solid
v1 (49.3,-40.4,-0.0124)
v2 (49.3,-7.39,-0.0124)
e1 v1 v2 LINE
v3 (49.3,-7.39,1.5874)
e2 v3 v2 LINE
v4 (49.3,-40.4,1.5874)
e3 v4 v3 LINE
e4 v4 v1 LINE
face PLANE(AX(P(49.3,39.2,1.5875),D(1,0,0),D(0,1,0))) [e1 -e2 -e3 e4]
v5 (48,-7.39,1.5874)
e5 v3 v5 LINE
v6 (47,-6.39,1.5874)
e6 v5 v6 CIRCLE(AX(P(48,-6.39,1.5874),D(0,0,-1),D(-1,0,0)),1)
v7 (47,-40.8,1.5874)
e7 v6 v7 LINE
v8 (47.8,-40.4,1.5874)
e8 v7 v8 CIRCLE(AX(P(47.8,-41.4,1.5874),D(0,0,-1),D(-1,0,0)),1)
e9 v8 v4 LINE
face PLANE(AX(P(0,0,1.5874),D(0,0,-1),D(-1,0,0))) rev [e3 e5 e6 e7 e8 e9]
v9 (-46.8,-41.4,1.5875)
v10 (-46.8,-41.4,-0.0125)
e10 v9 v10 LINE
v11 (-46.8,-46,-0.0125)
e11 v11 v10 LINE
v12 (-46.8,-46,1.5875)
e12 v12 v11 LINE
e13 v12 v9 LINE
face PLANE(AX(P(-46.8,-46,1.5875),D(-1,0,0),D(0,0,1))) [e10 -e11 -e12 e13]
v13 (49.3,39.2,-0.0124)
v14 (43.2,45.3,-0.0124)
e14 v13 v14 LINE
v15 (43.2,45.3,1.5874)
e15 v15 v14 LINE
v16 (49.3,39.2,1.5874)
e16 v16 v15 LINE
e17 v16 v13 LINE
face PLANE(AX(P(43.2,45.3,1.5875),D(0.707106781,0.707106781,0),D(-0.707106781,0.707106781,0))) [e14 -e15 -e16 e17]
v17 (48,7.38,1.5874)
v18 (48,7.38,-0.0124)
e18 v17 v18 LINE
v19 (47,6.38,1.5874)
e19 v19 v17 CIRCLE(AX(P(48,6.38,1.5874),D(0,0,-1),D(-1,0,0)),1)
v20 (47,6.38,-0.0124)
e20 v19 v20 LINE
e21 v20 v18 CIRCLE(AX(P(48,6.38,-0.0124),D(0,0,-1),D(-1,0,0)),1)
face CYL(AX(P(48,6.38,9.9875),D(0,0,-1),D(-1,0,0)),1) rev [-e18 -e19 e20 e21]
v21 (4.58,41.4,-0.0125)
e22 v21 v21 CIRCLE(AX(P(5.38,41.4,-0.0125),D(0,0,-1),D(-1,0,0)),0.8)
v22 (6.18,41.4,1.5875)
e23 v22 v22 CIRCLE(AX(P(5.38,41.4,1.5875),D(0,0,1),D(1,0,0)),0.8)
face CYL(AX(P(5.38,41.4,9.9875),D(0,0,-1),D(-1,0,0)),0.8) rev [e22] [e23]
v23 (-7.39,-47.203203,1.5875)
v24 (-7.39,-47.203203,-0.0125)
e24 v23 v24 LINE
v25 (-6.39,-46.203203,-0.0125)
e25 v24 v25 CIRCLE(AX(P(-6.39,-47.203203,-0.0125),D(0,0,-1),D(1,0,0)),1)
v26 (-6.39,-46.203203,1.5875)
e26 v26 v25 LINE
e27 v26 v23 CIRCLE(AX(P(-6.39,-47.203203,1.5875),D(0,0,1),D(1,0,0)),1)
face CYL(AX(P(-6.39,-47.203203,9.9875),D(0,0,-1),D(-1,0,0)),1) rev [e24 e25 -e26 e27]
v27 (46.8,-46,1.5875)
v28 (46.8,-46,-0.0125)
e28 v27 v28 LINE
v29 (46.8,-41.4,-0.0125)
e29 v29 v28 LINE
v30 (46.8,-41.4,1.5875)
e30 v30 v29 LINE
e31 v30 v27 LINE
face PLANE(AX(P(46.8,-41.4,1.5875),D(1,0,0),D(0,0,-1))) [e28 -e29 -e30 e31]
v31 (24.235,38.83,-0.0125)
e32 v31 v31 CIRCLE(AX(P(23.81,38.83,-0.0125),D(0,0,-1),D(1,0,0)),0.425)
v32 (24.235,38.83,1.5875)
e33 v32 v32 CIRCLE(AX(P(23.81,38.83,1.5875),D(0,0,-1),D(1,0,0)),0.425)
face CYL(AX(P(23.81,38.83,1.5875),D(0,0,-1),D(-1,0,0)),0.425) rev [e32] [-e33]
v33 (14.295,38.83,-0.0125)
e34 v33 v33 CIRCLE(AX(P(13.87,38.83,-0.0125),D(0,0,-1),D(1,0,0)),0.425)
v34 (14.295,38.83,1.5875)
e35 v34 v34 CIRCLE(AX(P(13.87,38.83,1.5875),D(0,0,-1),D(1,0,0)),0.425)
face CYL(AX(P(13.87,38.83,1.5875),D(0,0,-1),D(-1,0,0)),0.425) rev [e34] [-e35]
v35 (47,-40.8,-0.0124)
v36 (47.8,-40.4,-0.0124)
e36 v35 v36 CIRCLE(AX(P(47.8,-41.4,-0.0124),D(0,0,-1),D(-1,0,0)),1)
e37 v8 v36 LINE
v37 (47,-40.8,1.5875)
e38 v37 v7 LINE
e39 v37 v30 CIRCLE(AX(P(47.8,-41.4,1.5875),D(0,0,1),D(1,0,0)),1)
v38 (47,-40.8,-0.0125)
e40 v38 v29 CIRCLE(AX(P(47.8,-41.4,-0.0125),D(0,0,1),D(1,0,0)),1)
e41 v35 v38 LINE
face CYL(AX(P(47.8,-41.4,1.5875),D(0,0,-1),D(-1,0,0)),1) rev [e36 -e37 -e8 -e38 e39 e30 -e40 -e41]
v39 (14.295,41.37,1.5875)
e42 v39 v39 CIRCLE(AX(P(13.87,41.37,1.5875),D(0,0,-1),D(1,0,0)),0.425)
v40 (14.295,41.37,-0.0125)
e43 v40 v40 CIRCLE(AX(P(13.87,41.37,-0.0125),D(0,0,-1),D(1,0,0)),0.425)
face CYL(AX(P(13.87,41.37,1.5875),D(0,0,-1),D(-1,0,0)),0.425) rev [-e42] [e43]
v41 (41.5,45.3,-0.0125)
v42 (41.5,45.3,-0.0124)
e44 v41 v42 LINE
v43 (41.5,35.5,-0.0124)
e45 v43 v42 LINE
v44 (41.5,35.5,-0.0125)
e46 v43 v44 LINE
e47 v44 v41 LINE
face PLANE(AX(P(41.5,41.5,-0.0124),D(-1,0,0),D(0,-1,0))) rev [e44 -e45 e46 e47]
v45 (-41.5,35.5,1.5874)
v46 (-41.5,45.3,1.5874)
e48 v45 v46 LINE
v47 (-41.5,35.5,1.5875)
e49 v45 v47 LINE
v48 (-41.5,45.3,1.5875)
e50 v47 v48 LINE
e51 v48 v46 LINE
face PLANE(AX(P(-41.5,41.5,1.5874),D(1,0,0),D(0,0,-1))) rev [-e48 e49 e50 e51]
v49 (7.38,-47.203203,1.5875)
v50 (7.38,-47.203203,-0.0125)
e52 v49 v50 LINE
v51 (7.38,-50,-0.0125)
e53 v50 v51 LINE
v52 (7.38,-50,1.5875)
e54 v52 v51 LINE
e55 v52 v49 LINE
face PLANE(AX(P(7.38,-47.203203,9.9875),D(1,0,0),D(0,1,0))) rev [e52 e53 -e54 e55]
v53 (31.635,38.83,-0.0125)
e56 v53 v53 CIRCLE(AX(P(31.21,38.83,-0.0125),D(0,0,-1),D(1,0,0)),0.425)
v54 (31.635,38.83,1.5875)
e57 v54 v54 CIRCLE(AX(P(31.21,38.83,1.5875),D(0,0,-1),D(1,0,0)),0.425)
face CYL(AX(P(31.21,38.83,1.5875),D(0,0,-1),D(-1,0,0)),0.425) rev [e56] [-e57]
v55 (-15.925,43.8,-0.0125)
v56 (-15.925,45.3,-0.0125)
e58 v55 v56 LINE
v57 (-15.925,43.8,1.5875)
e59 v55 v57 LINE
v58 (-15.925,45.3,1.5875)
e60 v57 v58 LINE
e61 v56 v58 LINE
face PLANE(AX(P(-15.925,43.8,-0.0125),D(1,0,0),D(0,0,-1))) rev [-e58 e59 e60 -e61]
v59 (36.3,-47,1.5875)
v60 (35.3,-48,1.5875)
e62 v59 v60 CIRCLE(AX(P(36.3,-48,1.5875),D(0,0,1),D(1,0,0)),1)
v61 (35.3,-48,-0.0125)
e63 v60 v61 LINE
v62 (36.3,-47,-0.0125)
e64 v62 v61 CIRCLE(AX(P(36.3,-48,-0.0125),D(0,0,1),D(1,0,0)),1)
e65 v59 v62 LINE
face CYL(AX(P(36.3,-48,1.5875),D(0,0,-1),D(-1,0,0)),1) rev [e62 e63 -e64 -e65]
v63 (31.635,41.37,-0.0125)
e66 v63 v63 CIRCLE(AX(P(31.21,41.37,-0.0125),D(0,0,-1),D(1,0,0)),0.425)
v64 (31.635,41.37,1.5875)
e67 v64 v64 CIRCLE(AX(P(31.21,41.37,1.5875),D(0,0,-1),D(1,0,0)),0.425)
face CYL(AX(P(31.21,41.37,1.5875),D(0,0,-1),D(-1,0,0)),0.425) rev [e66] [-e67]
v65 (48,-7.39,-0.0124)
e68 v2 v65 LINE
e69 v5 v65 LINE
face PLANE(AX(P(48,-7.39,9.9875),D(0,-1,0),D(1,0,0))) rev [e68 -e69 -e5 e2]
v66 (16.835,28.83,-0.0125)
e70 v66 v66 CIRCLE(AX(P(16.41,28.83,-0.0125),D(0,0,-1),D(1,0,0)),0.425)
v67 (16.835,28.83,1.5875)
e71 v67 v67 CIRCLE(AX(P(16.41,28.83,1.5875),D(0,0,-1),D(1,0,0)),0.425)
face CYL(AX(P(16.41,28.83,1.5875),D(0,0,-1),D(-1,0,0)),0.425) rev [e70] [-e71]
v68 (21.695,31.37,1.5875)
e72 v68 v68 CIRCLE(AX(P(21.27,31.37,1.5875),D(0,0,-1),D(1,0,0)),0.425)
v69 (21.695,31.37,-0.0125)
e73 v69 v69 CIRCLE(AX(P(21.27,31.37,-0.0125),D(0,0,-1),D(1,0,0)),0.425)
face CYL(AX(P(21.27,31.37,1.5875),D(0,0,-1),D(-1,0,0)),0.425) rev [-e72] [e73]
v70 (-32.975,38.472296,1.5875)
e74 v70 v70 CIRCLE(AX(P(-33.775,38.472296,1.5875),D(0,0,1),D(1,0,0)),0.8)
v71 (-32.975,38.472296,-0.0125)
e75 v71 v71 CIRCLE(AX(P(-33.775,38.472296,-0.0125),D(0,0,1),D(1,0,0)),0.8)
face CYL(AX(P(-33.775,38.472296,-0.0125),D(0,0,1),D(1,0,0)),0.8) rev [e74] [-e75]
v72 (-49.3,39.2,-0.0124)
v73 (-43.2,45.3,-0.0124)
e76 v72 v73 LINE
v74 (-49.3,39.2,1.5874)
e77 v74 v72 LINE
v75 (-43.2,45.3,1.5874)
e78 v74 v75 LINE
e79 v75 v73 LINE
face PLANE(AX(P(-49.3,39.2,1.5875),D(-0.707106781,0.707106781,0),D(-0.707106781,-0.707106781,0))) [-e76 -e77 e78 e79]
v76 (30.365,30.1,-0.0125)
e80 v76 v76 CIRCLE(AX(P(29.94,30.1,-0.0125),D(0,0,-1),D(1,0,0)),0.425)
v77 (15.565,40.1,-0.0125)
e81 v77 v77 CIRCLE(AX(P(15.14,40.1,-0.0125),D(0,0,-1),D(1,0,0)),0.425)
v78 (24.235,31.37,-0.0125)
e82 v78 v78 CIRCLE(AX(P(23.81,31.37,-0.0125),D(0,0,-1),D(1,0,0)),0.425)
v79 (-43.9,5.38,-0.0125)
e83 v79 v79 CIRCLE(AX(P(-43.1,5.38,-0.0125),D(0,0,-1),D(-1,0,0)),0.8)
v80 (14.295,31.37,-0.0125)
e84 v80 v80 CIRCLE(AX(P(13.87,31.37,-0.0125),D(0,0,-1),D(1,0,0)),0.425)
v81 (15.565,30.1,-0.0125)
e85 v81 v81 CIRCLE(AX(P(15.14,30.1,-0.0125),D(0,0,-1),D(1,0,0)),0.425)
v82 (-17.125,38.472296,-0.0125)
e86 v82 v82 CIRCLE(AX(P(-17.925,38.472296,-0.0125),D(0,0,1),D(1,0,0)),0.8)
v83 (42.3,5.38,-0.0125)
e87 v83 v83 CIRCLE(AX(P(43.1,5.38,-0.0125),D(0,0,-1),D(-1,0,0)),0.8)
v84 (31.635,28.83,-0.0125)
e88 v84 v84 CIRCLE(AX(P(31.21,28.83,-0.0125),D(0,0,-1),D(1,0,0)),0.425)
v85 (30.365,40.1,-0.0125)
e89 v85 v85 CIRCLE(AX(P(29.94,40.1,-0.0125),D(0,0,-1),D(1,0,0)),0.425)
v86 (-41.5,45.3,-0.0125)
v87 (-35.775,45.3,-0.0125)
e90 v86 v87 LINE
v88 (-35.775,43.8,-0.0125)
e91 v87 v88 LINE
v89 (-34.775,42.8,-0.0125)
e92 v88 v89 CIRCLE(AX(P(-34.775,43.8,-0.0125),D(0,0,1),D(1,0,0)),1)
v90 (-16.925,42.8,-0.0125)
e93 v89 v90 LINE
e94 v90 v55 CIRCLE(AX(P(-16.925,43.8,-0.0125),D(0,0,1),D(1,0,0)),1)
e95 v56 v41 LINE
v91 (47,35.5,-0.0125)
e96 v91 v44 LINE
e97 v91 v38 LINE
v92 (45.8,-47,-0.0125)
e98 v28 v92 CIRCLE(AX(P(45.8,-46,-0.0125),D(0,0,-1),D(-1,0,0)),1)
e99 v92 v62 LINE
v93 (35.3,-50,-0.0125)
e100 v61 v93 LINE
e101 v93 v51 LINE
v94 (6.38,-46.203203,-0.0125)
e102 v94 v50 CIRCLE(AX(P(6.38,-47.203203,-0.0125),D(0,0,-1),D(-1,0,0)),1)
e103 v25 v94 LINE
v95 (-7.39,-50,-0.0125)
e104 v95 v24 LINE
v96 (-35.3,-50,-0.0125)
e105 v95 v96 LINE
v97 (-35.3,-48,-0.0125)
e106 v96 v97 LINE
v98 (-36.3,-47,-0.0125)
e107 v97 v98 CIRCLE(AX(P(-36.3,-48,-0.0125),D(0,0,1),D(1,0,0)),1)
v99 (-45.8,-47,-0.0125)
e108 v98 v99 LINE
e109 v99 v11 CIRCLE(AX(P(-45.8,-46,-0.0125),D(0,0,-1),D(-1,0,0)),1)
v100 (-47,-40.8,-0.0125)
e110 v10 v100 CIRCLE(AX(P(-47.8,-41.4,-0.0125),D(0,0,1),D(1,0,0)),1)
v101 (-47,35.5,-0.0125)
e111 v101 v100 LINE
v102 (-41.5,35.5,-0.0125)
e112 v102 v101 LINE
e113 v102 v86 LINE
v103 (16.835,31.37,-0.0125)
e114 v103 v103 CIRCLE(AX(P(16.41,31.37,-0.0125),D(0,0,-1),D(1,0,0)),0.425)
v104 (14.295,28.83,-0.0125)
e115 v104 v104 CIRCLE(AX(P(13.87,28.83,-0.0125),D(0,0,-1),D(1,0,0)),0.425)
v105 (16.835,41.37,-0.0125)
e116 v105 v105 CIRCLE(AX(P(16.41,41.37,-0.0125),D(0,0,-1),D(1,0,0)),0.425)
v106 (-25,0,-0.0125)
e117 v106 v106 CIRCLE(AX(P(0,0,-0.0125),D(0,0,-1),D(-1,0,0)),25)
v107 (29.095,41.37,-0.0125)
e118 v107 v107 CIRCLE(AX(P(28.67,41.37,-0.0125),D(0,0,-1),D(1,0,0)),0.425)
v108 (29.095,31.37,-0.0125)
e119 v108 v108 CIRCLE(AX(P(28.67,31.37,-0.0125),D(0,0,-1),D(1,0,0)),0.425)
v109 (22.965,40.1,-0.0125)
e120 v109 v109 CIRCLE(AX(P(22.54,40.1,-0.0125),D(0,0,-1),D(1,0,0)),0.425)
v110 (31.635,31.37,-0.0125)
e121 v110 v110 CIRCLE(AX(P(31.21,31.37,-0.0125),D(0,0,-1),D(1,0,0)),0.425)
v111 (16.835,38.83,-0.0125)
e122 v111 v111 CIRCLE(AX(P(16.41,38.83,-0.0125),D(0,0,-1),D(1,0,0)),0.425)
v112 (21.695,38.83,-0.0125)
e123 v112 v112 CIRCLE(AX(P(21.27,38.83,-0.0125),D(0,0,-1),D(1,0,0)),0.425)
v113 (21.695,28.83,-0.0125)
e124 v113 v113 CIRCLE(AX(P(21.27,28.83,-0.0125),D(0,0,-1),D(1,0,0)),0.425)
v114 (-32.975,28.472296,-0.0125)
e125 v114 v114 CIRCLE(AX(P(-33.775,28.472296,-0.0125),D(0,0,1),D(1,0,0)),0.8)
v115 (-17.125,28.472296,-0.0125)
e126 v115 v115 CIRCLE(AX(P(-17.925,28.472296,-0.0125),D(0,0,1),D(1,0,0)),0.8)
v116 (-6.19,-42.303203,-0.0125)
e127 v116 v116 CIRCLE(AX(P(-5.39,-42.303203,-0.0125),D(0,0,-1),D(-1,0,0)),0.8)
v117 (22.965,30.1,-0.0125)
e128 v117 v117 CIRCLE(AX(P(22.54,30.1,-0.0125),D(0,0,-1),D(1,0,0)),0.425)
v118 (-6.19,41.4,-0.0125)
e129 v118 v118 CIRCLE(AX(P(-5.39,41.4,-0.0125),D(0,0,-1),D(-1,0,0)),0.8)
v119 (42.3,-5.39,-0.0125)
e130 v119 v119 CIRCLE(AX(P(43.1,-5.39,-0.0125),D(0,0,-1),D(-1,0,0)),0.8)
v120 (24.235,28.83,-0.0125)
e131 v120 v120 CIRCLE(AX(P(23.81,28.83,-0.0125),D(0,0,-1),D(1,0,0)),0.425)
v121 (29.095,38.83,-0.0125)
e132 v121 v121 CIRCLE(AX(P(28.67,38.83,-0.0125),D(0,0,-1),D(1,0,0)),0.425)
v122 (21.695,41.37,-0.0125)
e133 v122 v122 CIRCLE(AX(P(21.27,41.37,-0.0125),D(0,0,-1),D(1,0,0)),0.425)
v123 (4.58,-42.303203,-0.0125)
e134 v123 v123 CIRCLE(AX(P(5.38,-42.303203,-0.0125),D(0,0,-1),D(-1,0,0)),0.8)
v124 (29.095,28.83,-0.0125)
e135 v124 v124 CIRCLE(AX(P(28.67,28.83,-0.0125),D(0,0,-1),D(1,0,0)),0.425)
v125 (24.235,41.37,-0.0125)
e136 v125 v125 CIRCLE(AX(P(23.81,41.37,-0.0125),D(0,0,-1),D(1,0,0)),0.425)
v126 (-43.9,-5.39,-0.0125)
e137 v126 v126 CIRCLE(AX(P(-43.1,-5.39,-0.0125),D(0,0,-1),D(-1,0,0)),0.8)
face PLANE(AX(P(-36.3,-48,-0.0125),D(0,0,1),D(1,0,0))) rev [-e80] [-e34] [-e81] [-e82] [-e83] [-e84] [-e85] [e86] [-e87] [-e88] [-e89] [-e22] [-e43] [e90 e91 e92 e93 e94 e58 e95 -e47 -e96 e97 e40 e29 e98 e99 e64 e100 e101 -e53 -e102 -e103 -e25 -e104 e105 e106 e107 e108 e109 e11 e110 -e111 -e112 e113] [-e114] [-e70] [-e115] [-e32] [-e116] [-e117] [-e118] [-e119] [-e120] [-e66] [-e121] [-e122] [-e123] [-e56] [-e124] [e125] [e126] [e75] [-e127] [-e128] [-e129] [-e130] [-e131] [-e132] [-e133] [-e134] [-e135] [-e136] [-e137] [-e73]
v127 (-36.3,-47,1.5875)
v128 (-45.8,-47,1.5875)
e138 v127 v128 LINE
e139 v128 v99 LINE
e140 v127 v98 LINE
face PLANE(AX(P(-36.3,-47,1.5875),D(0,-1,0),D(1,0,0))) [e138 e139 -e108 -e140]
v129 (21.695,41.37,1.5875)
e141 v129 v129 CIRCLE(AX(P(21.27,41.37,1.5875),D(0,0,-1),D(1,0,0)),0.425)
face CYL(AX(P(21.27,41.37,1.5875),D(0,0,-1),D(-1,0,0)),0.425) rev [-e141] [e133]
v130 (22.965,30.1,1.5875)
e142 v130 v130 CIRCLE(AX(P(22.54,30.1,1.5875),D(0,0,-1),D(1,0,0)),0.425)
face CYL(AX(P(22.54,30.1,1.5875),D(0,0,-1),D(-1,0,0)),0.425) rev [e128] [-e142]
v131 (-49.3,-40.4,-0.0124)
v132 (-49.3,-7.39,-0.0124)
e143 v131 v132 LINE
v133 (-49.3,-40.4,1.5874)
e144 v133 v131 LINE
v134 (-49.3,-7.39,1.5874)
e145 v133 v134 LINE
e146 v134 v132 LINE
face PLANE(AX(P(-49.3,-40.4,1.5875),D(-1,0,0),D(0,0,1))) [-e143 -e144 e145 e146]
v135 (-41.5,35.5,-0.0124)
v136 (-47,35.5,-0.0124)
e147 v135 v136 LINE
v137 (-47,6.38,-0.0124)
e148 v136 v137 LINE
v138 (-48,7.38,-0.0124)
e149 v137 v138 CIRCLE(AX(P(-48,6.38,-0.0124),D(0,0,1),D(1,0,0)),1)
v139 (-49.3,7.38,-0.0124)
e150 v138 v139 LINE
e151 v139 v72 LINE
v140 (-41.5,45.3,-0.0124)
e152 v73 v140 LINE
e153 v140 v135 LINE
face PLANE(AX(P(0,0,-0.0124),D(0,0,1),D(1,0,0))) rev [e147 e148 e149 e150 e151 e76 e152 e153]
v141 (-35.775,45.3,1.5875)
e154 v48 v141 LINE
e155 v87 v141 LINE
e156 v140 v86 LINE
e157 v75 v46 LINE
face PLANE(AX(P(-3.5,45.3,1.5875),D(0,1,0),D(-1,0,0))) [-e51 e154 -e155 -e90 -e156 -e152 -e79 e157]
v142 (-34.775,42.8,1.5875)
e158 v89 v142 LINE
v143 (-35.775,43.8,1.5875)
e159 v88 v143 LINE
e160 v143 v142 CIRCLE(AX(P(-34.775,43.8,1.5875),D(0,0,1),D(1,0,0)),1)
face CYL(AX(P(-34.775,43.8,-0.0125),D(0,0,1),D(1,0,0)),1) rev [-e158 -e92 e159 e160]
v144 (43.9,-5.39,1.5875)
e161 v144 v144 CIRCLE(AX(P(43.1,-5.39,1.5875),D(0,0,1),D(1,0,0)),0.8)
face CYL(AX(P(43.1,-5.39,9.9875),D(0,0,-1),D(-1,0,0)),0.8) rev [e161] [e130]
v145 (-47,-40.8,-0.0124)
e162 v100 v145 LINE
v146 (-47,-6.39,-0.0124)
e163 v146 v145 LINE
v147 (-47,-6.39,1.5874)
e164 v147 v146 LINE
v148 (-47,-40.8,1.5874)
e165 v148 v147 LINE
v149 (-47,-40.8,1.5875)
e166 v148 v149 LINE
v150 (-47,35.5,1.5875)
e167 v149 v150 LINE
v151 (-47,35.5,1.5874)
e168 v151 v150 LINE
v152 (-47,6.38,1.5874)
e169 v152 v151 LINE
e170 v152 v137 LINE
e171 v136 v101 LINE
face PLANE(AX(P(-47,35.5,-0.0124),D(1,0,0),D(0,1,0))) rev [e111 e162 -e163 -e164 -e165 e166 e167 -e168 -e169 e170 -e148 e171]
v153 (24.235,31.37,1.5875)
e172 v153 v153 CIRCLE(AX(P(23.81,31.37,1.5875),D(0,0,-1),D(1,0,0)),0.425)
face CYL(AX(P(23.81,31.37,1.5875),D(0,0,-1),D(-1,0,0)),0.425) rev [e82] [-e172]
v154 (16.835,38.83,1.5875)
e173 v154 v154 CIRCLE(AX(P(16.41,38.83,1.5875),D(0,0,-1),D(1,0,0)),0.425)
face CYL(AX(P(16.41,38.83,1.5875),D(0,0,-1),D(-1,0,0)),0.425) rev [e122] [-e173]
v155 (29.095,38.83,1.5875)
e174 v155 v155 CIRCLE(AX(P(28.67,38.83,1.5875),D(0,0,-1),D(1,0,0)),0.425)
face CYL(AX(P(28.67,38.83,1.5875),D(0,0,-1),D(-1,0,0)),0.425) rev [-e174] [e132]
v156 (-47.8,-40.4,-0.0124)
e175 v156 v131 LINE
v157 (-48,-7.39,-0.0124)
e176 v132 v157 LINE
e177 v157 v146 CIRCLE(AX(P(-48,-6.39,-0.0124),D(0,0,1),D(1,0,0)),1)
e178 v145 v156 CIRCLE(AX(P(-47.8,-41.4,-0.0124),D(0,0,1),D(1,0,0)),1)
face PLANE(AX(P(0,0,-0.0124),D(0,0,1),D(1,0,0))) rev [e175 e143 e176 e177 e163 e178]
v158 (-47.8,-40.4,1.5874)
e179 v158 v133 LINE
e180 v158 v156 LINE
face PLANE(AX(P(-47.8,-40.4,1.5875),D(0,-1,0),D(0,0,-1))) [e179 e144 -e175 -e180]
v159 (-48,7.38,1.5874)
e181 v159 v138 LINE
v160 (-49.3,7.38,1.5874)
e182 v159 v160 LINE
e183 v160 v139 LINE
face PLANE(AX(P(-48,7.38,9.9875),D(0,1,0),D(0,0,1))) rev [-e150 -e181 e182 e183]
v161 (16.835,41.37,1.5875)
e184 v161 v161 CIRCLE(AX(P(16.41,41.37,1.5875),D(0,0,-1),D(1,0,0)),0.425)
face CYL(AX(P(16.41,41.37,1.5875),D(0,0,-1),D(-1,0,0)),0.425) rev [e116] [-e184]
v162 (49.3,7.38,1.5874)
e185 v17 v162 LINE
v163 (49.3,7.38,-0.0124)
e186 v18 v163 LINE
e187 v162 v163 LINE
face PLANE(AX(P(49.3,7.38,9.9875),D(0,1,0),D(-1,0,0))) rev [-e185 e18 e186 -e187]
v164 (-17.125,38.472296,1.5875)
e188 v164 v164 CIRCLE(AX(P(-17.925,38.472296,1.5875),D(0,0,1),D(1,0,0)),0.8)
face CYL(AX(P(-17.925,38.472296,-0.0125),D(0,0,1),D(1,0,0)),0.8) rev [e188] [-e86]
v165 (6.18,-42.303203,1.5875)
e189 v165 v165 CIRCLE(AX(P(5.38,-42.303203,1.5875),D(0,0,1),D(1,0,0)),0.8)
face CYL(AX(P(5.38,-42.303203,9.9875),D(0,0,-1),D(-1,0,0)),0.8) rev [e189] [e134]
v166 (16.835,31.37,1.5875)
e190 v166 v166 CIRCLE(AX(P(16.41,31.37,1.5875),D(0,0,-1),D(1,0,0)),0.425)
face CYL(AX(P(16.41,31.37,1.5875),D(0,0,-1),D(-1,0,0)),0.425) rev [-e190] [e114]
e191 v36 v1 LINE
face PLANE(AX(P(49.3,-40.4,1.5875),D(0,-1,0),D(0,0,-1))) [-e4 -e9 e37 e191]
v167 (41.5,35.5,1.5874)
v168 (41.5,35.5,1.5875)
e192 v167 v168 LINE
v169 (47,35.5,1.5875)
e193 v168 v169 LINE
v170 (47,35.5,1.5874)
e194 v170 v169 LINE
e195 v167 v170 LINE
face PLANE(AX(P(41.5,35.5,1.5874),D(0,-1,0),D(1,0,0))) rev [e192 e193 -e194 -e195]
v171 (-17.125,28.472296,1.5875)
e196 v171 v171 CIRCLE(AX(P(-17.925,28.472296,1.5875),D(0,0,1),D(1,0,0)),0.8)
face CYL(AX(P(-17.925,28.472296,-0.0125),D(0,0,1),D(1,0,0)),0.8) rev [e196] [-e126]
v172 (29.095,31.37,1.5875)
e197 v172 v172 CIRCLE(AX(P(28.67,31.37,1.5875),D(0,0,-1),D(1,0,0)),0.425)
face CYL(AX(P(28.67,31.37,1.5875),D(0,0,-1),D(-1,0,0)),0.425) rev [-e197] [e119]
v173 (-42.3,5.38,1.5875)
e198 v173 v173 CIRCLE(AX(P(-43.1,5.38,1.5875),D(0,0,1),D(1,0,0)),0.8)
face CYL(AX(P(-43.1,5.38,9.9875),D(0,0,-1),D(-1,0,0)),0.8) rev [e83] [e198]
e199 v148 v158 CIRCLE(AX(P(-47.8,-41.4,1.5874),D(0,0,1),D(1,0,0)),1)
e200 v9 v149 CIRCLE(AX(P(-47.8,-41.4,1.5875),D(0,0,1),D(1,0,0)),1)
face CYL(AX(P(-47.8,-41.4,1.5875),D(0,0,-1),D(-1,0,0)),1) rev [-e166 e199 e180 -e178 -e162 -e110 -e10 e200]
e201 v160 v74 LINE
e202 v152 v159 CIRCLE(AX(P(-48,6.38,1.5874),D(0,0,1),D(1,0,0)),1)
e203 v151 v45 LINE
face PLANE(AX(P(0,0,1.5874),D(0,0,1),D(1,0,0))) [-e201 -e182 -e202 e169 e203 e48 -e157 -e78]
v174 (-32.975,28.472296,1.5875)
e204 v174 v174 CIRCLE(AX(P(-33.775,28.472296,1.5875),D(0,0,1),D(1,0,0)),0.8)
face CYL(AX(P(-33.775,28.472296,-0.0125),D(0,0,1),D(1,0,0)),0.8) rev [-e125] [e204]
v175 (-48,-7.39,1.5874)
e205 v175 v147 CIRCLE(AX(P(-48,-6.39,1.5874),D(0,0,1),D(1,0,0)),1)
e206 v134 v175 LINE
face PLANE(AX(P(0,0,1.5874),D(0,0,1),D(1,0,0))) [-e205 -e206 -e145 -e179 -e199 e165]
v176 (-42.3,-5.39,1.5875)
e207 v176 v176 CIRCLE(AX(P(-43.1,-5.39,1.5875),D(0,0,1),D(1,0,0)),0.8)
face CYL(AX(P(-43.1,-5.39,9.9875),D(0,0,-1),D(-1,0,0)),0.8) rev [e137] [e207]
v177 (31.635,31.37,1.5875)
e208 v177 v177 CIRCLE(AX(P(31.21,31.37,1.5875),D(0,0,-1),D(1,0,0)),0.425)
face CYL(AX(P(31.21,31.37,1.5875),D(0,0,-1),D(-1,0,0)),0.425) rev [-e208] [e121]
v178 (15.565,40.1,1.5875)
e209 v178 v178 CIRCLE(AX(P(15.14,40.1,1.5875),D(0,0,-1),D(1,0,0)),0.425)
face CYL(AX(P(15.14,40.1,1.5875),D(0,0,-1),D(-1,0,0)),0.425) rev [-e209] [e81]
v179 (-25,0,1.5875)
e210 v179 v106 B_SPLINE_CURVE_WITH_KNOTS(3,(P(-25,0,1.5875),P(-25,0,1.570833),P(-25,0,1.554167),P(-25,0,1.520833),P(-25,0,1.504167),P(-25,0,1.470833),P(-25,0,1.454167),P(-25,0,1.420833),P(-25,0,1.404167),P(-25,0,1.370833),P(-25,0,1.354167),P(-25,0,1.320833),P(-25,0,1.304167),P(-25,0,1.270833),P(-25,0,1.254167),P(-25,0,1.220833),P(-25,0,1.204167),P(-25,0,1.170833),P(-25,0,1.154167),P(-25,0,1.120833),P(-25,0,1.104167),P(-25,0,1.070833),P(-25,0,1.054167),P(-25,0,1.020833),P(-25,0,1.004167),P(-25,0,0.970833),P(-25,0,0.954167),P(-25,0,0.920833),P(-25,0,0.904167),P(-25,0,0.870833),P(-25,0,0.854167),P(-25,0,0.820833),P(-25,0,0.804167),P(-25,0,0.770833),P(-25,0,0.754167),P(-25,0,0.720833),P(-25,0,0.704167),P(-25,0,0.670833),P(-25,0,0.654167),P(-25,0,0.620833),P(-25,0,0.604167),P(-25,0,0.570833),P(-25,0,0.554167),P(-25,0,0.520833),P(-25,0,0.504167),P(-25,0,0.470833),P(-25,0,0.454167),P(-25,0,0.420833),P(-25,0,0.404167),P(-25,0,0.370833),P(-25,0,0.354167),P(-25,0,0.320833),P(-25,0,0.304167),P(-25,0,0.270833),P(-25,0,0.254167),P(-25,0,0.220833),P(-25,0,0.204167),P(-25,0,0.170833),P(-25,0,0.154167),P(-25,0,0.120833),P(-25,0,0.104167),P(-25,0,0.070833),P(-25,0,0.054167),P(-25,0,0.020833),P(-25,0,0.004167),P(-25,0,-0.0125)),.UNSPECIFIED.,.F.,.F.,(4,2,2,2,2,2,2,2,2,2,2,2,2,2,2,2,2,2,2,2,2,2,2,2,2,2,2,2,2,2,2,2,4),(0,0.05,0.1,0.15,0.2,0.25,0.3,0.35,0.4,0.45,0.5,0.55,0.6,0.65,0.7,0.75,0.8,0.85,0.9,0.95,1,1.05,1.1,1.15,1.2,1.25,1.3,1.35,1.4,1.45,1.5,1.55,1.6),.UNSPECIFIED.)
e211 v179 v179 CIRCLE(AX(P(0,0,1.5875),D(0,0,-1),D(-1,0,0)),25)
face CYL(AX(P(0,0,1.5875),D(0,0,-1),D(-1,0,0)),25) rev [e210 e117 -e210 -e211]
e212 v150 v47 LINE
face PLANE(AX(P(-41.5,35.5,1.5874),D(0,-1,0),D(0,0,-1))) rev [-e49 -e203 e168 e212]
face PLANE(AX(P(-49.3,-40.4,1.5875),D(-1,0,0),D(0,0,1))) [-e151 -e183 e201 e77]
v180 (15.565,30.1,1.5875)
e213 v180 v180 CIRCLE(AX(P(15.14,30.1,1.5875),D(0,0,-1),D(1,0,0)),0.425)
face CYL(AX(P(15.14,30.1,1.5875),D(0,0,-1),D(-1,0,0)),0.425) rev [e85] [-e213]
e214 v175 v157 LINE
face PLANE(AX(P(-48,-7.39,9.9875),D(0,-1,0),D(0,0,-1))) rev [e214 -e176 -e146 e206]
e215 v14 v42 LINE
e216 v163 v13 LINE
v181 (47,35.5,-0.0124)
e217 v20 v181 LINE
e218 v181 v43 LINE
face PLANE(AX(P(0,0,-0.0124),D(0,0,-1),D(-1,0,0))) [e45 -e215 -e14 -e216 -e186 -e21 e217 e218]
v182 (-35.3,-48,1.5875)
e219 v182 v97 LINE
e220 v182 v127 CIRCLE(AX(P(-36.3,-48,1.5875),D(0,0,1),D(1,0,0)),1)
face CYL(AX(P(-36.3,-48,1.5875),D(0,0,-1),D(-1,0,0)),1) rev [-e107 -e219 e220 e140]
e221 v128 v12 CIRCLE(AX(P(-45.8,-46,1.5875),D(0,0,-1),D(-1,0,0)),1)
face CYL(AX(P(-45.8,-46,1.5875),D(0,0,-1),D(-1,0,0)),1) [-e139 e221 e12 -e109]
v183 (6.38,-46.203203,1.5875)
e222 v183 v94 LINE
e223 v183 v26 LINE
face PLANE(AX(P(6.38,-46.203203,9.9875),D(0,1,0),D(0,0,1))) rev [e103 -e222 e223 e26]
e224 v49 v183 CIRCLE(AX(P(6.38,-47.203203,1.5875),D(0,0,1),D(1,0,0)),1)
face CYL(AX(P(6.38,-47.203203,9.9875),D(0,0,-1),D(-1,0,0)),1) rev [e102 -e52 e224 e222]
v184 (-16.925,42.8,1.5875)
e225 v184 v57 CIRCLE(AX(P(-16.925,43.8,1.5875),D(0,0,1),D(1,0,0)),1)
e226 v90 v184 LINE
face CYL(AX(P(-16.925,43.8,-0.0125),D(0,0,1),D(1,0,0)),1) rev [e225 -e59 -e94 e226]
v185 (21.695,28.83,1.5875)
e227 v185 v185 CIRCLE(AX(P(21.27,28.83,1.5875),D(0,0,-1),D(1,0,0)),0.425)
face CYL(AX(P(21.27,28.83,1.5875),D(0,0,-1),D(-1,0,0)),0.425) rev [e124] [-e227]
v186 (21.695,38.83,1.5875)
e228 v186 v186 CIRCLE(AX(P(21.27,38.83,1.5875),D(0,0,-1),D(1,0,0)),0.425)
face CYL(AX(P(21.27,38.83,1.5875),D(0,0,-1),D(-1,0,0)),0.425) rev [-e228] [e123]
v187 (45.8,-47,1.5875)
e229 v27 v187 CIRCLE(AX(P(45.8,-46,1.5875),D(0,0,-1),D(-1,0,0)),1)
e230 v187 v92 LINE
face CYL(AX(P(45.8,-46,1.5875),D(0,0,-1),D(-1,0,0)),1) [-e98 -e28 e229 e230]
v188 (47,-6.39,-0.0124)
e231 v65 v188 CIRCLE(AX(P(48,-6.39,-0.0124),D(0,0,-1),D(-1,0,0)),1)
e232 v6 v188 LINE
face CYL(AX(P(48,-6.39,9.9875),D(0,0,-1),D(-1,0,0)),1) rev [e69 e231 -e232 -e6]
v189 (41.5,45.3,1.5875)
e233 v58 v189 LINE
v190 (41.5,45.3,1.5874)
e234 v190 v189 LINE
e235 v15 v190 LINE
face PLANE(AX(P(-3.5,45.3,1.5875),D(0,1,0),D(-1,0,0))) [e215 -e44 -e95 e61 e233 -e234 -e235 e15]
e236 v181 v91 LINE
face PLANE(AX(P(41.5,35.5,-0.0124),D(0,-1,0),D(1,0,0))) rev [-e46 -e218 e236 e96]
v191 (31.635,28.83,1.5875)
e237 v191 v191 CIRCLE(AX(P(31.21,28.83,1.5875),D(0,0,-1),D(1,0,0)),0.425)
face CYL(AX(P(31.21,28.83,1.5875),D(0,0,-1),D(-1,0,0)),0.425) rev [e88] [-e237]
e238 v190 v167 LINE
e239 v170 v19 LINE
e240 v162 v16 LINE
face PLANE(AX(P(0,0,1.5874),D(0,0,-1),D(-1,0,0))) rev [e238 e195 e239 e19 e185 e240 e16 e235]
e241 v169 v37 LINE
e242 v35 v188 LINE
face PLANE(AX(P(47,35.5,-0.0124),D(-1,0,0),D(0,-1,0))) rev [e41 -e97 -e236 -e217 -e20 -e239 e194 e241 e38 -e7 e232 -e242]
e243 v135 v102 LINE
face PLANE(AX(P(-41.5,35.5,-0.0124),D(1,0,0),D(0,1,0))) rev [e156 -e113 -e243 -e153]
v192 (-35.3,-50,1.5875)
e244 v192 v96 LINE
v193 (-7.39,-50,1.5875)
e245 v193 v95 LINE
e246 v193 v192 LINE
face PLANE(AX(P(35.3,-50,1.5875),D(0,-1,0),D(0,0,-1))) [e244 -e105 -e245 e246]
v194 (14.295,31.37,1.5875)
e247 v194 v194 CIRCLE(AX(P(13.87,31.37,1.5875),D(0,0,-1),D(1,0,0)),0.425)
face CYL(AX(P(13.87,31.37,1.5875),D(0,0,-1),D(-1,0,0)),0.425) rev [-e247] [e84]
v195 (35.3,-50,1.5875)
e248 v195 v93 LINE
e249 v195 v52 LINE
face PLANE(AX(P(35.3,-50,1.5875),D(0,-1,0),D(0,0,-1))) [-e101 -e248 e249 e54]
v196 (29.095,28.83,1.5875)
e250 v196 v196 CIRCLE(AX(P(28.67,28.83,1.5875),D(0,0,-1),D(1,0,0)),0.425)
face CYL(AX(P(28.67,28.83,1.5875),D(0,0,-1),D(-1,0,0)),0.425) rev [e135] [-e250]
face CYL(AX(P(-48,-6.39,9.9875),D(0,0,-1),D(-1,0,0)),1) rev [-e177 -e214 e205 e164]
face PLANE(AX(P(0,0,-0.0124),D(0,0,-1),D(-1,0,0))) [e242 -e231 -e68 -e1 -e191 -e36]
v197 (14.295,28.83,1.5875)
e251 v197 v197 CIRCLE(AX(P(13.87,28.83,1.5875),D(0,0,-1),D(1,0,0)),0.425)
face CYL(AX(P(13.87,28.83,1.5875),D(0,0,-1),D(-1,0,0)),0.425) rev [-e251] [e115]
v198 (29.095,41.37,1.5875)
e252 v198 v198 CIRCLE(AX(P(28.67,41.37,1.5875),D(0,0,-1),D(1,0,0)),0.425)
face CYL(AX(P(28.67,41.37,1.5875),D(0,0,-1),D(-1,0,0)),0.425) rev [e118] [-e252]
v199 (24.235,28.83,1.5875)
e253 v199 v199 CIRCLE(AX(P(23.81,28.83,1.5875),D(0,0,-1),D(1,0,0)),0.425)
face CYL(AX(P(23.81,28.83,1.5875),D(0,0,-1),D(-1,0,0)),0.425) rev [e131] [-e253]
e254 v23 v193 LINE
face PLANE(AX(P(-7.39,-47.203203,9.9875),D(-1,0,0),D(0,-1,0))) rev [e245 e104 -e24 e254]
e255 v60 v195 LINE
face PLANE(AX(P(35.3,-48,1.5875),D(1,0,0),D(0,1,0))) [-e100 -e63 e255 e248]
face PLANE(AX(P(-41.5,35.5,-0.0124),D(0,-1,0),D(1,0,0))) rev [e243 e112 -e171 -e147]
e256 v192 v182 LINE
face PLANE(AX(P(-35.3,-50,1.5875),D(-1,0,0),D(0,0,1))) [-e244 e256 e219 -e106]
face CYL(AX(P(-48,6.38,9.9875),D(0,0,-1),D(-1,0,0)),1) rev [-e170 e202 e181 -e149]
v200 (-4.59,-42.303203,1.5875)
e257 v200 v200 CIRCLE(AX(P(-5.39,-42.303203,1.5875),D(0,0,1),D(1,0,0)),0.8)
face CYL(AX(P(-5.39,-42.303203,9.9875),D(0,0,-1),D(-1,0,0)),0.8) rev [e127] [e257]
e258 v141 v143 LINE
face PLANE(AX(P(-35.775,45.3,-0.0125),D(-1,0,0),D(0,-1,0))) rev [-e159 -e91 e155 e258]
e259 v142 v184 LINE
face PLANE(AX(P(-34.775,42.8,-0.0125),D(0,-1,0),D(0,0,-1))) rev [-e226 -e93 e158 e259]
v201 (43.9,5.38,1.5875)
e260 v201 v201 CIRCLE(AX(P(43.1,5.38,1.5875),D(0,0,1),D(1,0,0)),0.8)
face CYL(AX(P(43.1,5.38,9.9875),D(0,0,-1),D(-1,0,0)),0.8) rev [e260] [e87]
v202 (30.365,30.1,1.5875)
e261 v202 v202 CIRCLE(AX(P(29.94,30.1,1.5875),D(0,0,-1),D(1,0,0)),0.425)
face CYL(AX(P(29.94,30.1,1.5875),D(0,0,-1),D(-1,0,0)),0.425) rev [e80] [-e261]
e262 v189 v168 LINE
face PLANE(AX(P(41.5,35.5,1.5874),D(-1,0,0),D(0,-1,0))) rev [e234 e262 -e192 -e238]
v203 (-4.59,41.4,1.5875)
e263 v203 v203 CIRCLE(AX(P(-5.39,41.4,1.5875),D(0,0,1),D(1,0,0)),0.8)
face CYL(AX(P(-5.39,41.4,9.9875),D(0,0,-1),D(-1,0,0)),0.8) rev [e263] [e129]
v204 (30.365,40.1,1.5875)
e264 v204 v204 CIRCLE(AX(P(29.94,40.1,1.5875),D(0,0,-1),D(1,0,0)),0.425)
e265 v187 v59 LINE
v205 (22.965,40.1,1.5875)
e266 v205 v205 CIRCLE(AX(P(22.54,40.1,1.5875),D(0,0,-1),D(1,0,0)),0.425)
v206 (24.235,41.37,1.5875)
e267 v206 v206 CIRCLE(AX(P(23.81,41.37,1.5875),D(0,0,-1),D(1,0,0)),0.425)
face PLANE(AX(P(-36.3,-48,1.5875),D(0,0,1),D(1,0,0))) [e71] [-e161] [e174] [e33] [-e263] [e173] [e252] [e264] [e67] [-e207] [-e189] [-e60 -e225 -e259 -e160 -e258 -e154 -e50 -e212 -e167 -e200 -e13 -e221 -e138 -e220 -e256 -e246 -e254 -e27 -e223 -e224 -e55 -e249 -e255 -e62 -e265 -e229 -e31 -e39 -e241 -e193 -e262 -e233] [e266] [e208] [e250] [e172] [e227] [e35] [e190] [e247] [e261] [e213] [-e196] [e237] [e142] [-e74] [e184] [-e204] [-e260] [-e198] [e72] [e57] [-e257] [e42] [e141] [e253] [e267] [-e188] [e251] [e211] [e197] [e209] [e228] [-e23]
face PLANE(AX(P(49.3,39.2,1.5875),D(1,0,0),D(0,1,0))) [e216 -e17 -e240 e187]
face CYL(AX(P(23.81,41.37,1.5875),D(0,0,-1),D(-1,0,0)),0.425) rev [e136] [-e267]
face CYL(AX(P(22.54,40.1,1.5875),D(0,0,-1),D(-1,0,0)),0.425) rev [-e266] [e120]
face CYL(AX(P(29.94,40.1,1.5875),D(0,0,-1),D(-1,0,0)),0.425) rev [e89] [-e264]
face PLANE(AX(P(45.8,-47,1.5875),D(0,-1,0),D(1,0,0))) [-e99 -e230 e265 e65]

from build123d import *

# Parameters (mm, degrees)
SKETCH1_R                = 0.425
BOSS_EXTRUDE1_DEPTH      = 1.6
LPATTERN2_START          = -0.0125
LPATTERN2_OUTLINE_R      = 0.425
LPATTERN2_DEPTH          = 1.6
SLOTFOOTPRINTS_REF_DEPTH = 0.0001
SLOTFOOTPRINTS_DEPTH     = 0.0001
SKETCH2_R                = 0.8
F_20PIN_MOUNTS_DEPTH     = 71.235674696
SKETCH3_R                = 0.8
F_12PIN_MOUNTS_DEPTH     = 10
SKETCH4_R                = 25
CUT_EXTRUDE1_DEPTH       = 71.235674696


# Read off the part's stored shape, not the designer's step: LPattern2
with BuildPart() as part:
    # Sketch1 → Boss-Extrude1 (new body)
    with BuildSketch(Plane(origin=(0, 0, -0.0125), x_dir=(-1, 0, 0), z_dir=(0, 0, -1))):
        with BuildLine():
            Line((35.3, -50), (35.3, -48))
            ThreePointArc((35.3, -48), (35.592893219, -47.292893219), (36.3, -47))
            Line((36.3, -47), (45.8, -47))
            ThreePointArc((45.8, -47), (46.507106781, -46.707106781), (46.8, -46))
            Line((46.8, -46), (46.8, -41.4))
            ThreePointArc((46.8, -41.4), (47.092893219, -40.692893219), (47.8, -40.4))
            Line((47.8, -40.4), (49.3, -40.4))
            Line((49.3, -40.4), (49.3, 39.2))
            Line((49.3, 39.2), (43.2, 45.3))
            Line((43.2, 45.3), (35.500000002, 45.3))
            Line((35.500000002, 45.3), (3.499999998, 45.3))
            Line((3.499999998, 45.3), (-43.2, 45.3))
            Line((-43.2, 45.3), (-49.3, 39.2))
            Line((-49.3, 39.2), (-49.3, -40.4))
            Line((-49.3, -40.4), (-47.8, -40.4))
            ThreePointArc((-47.8, -40.4), (-47.092893219, -40.692893219), (-46.8, -41.4))
            Line((-46.8, -41.4), (-46.8, -46))
            ThreePointArc((-46.8, -46), (-46.507106781, -46.707106781), (-45.8, -47))
            Line((-45.8, -47), (-36.3, -47))
            ThreePointArc((-36.3, -47), (-35.592893219, -47.292893219), (-35.3, -48))
            Line((-35.3, -48), (-35.3, -50))
            Line((-35.3, -50), (35.3, -50))
        make_face()
        with Locations(Location((-21.27, 41.37, 0), (0, 0, 180))):
            Circle(SKETCH1_R, mode=Mode.SUBTRACT)
        with Locations(Location((-23.81, 41.37, 0), (0, 0, 180))):
            Circle(SKETCH1_R, mode=Mode.SUBTRACT)
        with Locations(Location((-22.54, 40.1, 0), (0, 0, 180))):
            Circle(SKETCH1_R, mode=Mode.SUBTRACT)
        with Locations(Location((-13.87, 41.37, 0), (0, 0, 180))):
            Circle(SKETCH1_R, mode=Mode.SUBTRACT)
        with Locations(Location((-23.81, 38.83, 0), (0, 0, 180))):
            Circle(SKETCH1_R, mode=Mode.SUBTRACT)
        with Locations(Location((-16.41, 41.37, 0), (0, 0, 180))):
            Circle(SKETCH1_R, mode=Mode.SUBTRACT)
        with Locations(Location((-15.14, 40.1, 0), (0, 0, 180))):
            Circle(SKETCH1_R, mode=Mode.SUBTRACT)
        with Locations(Location((-21.27, 38.83, 0), (0, 0, 180))):
            Circle(SKETCH1_R, mode=Mode.SUBTRACT)
        with Locations(Location((-28.67, 41.37, 0), (0, 0, 180))):
            Circle(SKETCH1_R, mode=Mode.SUBTRACT)
        with Locations(Location((-31.21, 41.37, 0), (0, 0, 180))):
            Circle(SKETCH1_R, mode=Mode.SUBTRACT)
        with Locations(Location((-16.41, 38.83, 0), (0, 0, 180))):
            Circle(SKETCH1_R, mode=Mode.SUBTRACT)
        with Locations(Location((-29.94, 40.1, 0), (0, 0, 180))):
            Circle(SKETCH1_R, mode=Mode.SUBTRACT)
        with Locations(Location((-31.21, 38.83, 0), (0, 0, 180))):
            Circle(SKETCH1_R, mode=Mode.SUBTRACT)
        with Locations(Location((-28.67, 38.83, 0), (0, 0, 180))):
            Circle(SKETCH1_R, mode=Mode.SUBTRACT)
        with Locations(Location((-13.87, 38.83, 0), (0, 0, 180))):
            Circle(SKETCH1_R, mode=Mode.SUBTRACT)
    extrude(amount=-BOSS_EXTRUDE1_DEPTH)

    # LPattern2 outline → LPattern2 (cut)
    with BuildSketch(Plane.XY.offset(LPATTERN2_START)):
        with Locations((31.21, 31.37)):
            Circle(LPATTERN2_OUTLINE_R)
        with Locations((31.21, 28.83)):
            Circle(LPATTERN2_OUTLINE_R)
        with Locations((29.94, 30.1)):
            Circle(LPATTERN2_OUTLINE_R)
        with Locations((28.67, 28.83)):
            Circle(LPATTERN2_OUTLINE_R)
        with Locations((28.67, 31.37)):
            Circle(LPATTERN2_OUTLINE_R)
        with Locations((16.41, 31.37)):
            Circle(LPATTERN2_OUTLINE_R)
        with Locations((23.81, 31.37)):
            Circle(LPATTERN2_OUTLINE_R)
        with Locations((23.81, 28.83)):
            Circle(LPATTERN2_OUTLINE_R)
        with Locations((22.54, 30.1)):
            Circle(LPATTERN2_OUTLINE_R)
        with Locations((21.27, 28.83)):
            Circle(LPATTERN2_OUTLINE_R)
        with Locations((21.27, 31.37)):
            Circle(LPATTERN2_OUTLINE_R)
        with Locations((16.41, 28.83)):
            Circle(LPATTERN2_OUTLINE_R)
        with Locations((15.14, 30.1)):
            Circle(LPATTERN2_OUTLINE_R)
        with Locations((13.87, 28.83)):
            Circle(LPATTERN2_OUTLINE_R)
        with Locations((13.87, 31.37)):
            Circle(LPATTERN2_OUTLINE_R)
    extrude(amount=LPATTERN2_DEPTH, mode=Mode.SUBTRACT)

    # thermalContacts_lower → slotFootprints_REF (cut)
    with BuildSketch(Plane(origin=(0, 0, -0.0125), x_dir=(-1, 0, 0), z_dir=(0, 0, -1))):
        Polygon((47, 35.5), (47, -41.5), (59.827263463, -41.5), (59.827263463, 47), (41.5, 47), (41.5, 41.5), (41.5, 35.5), align=None)
        Polygon((-47, 35.5), (-47, -41.5), (-56.192158269, -41.5), (-56.192158269, 47), (-41.5, 47), (-41.5, 41.5), (-41.5, 35.5), align=None)
    extrude(amount=-SLOTFOOTPRINTS_REF_DEPTH, mode=Mode.SUBTRACT)

    # thermalContacts_upper → slotFootprints (cut)
    with BuildSketch(Plane.XY.offset(1.5875)):
        Polygon((-47, 35.5), (-47, -41.5), (-56.192158269, -41.5), (-56.192158269, 47), (-41.5, 47), (-41.5, 41.5), (-41.5, 35.5), align=None)
        Polygon((47, 35.5), (47, -41.5), (59.827263463, -41.5), (59.827263463, 47), (41.5, 47), (41.5, 41.5), (41.5, 35.5), align=None)
    extrude(amount=-SLOTFOOTPRINTS_DEPTH, mode=Mode.SUBTRACT)

    # Sketch2 → 20pin_mounts (cut, through all)
    with BuildSketch(Plane.XY.offset(1.5875)):
        with Locations((-33.775, 38.472296419)):
            Circle(SKETCH2_R)
        with Locations((-17.925, 38.472296419)):
            Circle(SKETCH2_R)
        with Locations((-17.925, 28.472296419)):
            Circle(SKETCH2_R)
        with Locations((-33.775, 28.472296419)):
            Circle(SKETCH2_R)
        with BuildLine():
            Line((-35.775, 45.3), (-35.775, 43.8))
            ThreePointArc((-35.775, 43.8), (-35.482106781, 43.092893219), (-34.775, 42.8))
            Line((-34.775, 42.8), (-16.925, 42.8))
            ThreePointArc((-16.925, 42.8), (-16.217893218, 43.092893219), (-15.925, 43.8))
            Line((-15.925, 43.8), (-15.925, 45.3))
            Line((-15.925, 45.3), (-35.775, 45.3))
        make_face()
    extrude(amount=-F_20PIN_MOUNTS_DEPTH, mode=Mode.SUBTRACT)

    # Sketch3 → 12pin_mounts (cut)
    with BuildSketch(Plane(origin=(0, 0, -0.0125), x_dir=(-1, 0, 0), z_dir=(0, 0, -1))):
        with Locations((5.390000006, 41.4)):
            Circle(SKETCH3_R)
        with Locations((-5.379999994, 41.4)):
            Circle(SKETCH3_R)
        with Locations((43.1, 5.379999994)):
            Circle(SKETCH3_R)
        with Locations((43.1, -5.390000006)):
            Circle(SKETCH3_R)
        with Locations((5.390000006, -42.303202712)):
            Circle(SKETCH3_R)
        with Locations((-5.379999994, -42.303202712)):
            Circle(SKETCH3_R)
        with Locations((-43.1, -5.390000006)):
            Circle(SKETCH3_R)
        with Locations((-43.1, 5.379999994)):
            Circle(SKETCH3_R)
        with BuildLine():
            Line((-49.3, 7.379999994), (-48, 7.379999994))
            ThreePointArc((-48, 7.379999994), (-47.292893219, 7.087106775), (-47, 6.379999994))
            Line((-47, 6.379999994), (-47, -6.390000006))
            ThreePointArc((-47, -6.390000006), (-47.292893219, -7.097106787), (-48, -7.390000006))
            Line((-48, -7.390000006), (-49.3, -7.390000006))
            Line((-49.3, -7.390000006), (-49.3, 7.379999994))
        make_face()
        with BuildLine():
            Line((48, 7.379999994), (49.3, 7.379999994))
            Line((49.3, 7.379999994), (49.3, -7.390000006))
            Line((49.3, -7.390000006), (48, -7.390000006))
            ThreePointArc((48, -7.390000006), (47.292893219, -7.097106787), (47, -6.390000006))
            Line((47, -6.390000006), (47, 6.379999994))
            ThreePointArc((47, 6.379999994), (47.292893219, 7.087106775), (48, 7.379999994))
        make_face()
        with BuildLine():
            Line((-6.379999994, -46.203202712), (6.390000006, -46.203202712))
            ThreePointArc((6.390000006, -46.203202712), (7.097106787, -46.496095931), (7.390000006, -47.203202712))
            Line((7.390000006, -47.203202712), (7.390000006, -50))
            Line((7.390000006, -50), (-7.379999994, -50))
            Line((-7.379999994, -50), (-7.379999994, -47.203202712))
            ThreePointArc((-7.379999994, -47.203202712), (-7.087106775, -46.496095931), (-6.379999994, -46.203202712))
        make_face()
    extrude(amount=-F_12PIN_MOUNTS_DEPTH, mode=Mode.SUBTRACT)

    # Sketch4 → Cut-Extrude1 (cut, through all)
    with BuildSketch(Plane(origin=(0, 0, -0.0125), x_dir=(-1, 0, 0), z_dir=(0, 0, -1))):
        Circle(SKETCH4_R)
    extrude(amount=-CUT_EXTRUDE1_DEPTH, mode=Mode.SUBTRACT)


solid = part.part
